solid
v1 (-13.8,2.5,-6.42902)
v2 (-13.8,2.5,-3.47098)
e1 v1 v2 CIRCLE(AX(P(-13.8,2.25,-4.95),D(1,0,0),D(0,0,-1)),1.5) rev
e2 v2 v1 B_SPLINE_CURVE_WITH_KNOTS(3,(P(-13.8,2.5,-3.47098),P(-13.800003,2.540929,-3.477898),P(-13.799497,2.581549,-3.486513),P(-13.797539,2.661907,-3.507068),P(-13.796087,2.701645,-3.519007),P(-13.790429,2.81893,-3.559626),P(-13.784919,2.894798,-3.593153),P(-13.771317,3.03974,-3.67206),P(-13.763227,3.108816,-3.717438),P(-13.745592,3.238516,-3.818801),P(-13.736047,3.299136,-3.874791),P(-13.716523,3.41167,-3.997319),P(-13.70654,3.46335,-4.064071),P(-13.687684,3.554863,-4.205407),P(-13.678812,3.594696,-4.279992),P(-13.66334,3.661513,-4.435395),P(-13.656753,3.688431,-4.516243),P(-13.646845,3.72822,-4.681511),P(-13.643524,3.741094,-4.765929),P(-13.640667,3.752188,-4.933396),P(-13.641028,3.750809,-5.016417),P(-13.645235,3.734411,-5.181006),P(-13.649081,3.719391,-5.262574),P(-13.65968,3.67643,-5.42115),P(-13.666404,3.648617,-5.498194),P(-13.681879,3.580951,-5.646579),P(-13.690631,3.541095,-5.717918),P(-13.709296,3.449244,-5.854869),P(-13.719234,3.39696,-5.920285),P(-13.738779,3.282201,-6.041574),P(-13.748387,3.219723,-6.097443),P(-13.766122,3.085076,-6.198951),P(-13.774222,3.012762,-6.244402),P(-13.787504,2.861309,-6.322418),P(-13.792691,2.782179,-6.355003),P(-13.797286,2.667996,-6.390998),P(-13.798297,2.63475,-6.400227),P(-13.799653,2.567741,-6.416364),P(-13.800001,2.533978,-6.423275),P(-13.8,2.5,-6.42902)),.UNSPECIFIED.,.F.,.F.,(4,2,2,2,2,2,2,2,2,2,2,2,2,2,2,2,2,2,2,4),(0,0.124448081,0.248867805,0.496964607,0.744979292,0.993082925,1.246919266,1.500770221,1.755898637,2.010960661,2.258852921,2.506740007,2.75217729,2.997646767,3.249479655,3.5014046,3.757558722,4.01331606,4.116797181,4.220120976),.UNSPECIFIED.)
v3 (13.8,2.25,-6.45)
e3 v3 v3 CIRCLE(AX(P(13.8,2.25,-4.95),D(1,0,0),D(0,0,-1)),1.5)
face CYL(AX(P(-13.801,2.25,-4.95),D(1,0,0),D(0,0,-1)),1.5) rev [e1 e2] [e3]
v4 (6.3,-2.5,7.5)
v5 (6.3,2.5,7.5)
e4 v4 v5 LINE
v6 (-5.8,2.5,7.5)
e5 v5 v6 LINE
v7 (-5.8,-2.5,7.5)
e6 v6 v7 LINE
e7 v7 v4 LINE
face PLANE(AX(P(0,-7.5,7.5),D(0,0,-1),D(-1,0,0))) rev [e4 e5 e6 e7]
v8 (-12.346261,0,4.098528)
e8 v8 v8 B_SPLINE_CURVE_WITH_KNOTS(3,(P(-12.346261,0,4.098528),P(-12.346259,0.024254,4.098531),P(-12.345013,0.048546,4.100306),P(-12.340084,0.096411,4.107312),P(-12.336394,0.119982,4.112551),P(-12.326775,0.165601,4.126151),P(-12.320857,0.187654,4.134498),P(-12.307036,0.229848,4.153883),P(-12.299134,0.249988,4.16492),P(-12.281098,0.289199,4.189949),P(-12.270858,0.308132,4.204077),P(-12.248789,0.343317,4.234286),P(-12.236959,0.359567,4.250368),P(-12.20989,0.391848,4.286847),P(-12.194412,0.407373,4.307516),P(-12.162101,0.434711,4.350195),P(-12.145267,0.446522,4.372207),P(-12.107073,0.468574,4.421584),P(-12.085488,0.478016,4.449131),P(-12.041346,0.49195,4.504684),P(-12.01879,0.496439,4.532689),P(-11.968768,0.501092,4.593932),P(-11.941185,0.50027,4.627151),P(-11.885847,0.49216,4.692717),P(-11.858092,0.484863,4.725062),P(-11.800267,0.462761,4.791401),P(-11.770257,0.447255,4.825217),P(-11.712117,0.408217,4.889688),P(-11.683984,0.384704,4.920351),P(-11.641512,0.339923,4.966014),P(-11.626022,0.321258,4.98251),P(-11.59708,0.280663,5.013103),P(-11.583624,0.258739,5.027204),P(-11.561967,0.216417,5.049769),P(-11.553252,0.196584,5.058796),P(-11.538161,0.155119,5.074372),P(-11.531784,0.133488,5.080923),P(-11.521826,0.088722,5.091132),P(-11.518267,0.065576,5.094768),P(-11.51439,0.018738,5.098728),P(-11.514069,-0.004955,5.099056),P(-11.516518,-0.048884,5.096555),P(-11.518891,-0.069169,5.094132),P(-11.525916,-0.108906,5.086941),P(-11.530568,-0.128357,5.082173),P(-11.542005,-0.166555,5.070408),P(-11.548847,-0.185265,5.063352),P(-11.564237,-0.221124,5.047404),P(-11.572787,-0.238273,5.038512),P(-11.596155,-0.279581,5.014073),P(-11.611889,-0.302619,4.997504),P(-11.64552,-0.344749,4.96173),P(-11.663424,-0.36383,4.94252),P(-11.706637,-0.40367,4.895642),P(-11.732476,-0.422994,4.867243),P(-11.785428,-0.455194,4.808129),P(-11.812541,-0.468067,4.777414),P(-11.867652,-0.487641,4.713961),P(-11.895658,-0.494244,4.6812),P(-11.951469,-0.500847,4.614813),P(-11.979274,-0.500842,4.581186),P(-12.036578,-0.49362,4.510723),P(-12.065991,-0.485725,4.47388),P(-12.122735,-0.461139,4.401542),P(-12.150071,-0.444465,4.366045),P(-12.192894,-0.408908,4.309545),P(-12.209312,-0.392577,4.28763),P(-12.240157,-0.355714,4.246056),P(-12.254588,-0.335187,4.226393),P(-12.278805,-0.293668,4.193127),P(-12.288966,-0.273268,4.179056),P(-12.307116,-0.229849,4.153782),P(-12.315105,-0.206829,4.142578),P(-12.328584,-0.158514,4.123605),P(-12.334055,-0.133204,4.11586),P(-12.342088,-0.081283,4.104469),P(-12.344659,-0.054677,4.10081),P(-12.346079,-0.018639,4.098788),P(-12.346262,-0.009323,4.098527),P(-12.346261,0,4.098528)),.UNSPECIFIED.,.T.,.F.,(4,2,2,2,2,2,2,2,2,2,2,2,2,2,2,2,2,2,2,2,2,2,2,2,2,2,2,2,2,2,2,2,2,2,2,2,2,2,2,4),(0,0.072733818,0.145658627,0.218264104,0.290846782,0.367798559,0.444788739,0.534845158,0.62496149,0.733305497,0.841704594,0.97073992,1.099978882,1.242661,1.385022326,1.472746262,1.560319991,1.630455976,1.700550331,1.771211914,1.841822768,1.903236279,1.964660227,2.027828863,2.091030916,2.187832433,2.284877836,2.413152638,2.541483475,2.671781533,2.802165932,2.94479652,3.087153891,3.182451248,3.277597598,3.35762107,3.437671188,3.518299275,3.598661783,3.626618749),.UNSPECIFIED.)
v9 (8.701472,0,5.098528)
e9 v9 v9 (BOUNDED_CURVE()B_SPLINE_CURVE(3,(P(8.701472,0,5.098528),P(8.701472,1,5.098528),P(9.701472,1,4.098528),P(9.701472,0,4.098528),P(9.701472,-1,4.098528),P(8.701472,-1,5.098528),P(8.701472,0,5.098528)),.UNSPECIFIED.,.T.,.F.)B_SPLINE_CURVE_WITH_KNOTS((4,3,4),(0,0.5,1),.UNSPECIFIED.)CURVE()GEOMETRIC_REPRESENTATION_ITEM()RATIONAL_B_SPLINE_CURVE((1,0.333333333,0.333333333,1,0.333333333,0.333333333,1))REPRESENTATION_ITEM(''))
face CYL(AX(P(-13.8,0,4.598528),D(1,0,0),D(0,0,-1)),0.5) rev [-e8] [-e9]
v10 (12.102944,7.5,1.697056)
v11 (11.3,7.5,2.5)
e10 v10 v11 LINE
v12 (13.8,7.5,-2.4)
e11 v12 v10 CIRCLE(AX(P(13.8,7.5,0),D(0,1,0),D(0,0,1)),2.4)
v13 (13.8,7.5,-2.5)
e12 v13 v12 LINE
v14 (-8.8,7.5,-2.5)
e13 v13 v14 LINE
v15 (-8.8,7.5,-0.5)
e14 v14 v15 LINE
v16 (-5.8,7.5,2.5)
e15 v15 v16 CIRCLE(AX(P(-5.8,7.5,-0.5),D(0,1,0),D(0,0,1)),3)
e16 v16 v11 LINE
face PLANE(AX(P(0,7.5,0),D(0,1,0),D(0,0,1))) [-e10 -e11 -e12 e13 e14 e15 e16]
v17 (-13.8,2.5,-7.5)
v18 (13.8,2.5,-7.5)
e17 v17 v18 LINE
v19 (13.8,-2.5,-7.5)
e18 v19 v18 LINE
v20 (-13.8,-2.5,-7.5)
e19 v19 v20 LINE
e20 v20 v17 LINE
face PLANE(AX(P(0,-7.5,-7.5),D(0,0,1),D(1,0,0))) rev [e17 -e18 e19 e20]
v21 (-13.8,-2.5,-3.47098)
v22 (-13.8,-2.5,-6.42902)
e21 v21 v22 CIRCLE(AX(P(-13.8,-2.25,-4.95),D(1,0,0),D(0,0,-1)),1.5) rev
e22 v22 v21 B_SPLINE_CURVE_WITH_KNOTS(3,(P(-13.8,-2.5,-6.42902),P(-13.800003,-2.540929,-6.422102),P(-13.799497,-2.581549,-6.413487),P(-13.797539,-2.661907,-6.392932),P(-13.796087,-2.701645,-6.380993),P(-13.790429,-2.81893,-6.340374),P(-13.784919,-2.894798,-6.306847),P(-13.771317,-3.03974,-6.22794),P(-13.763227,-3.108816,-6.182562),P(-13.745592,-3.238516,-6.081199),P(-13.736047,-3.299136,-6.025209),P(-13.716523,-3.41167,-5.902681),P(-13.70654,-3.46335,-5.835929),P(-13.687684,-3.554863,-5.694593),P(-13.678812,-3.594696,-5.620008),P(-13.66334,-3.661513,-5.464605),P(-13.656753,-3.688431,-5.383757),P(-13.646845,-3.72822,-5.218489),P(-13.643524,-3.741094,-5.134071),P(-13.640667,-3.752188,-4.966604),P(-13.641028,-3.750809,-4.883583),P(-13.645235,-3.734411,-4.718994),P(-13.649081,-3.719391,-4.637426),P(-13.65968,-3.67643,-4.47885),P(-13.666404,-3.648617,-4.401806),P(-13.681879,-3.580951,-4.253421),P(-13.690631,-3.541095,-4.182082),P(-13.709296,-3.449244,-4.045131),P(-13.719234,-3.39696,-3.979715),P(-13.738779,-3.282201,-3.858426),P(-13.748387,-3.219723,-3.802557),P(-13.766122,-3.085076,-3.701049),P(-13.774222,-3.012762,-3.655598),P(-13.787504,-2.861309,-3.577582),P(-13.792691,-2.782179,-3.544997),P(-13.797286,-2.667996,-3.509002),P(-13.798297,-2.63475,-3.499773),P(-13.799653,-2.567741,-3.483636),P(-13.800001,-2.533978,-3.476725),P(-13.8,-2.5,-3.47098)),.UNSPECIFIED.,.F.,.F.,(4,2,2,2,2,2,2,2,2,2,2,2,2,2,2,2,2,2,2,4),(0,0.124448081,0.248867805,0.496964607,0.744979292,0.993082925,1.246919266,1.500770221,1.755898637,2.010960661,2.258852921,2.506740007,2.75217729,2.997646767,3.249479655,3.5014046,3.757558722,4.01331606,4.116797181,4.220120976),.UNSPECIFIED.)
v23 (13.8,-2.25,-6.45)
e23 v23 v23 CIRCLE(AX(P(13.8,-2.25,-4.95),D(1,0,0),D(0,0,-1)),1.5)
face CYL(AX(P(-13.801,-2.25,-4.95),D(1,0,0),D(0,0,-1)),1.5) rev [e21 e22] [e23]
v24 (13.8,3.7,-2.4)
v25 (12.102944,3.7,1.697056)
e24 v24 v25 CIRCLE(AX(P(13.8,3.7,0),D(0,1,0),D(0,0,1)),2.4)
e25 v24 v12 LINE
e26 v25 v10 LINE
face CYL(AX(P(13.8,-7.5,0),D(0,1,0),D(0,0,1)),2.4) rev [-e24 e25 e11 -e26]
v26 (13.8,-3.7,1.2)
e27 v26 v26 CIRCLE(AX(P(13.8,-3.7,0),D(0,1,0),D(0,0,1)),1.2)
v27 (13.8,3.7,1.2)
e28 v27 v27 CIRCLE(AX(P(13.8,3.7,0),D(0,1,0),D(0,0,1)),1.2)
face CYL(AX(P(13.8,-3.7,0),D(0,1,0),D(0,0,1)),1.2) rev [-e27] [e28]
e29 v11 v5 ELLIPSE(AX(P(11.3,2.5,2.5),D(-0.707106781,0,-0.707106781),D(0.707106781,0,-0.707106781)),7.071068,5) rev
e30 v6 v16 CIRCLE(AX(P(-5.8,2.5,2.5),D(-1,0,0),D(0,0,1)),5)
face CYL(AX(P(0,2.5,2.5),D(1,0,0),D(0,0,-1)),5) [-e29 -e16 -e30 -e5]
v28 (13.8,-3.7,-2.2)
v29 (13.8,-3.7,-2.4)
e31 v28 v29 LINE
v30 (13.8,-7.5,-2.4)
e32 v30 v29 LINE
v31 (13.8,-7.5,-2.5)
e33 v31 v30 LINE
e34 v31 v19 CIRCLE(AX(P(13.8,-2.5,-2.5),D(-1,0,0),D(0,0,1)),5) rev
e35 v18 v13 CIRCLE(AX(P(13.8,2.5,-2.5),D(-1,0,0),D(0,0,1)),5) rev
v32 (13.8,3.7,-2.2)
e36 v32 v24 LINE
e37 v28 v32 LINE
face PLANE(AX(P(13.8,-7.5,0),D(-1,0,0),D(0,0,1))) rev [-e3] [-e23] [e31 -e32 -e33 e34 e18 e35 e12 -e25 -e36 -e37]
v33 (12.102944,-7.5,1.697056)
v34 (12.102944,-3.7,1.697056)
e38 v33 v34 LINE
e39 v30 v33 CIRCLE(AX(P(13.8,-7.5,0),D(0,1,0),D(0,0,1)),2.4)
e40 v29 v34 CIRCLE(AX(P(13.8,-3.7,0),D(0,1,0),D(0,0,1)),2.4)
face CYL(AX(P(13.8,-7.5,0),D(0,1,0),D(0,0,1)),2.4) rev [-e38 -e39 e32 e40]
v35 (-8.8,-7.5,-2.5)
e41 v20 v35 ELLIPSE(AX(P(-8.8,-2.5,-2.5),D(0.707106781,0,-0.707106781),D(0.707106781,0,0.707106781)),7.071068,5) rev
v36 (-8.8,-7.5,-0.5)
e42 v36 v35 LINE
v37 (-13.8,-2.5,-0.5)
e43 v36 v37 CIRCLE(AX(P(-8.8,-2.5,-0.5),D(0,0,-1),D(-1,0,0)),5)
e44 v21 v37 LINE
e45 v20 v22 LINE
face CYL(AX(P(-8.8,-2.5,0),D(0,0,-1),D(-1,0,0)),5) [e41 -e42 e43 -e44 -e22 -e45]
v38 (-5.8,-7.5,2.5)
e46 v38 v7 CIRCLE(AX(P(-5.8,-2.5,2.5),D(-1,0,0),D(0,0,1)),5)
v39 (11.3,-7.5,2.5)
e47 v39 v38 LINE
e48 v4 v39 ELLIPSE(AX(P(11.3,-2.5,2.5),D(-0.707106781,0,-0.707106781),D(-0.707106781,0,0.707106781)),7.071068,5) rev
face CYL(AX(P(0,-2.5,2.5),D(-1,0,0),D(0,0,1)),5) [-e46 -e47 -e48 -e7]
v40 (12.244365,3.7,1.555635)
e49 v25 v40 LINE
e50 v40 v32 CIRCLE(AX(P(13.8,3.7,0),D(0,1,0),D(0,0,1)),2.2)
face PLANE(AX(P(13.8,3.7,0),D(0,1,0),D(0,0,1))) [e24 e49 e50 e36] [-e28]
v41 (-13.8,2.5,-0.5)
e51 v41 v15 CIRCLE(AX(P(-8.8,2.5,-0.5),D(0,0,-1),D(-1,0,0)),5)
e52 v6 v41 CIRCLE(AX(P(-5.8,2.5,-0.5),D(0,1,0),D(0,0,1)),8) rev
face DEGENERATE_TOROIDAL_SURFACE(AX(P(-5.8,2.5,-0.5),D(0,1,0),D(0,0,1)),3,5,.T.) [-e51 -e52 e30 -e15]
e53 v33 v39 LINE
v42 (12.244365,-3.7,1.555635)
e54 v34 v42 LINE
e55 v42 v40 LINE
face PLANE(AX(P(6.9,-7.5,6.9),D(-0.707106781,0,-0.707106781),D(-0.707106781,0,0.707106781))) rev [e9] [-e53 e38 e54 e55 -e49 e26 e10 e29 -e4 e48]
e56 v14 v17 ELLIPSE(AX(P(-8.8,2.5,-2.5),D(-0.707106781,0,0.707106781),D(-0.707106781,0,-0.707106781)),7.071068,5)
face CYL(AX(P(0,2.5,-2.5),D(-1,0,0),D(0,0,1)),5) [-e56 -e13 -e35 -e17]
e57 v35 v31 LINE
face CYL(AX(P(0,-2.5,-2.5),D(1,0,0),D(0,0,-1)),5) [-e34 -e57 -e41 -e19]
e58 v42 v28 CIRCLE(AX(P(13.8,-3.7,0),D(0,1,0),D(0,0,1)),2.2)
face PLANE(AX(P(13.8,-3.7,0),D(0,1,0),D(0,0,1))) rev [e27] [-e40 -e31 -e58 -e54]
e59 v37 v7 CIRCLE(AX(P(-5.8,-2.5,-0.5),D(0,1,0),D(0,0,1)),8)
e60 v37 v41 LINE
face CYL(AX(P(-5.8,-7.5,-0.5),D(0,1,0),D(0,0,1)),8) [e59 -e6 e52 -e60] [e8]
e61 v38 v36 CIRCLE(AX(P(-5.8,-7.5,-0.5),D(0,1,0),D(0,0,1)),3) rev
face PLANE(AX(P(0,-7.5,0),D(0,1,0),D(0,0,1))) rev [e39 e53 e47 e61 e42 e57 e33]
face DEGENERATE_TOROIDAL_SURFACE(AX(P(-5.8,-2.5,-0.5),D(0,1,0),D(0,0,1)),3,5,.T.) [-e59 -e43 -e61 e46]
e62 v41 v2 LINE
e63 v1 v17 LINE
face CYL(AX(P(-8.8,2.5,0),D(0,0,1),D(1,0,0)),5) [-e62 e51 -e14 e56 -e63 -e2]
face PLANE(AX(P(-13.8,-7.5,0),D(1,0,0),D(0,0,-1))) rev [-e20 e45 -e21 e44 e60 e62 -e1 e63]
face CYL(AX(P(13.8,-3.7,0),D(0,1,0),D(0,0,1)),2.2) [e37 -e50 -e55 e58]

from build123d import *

# Parameters (mm, degrees)
BOSS_EXTRUDE1_DEPTH      = 7.5
BOSS_EXTRUDE1_DEPTH_BACK = 7.5
CUT_EXTRUDE3_REACH       = 31.568
SKETCH5_R                = 1.5
BOSS_EXTRUDE2_DEPTH      = 3.7
BOSS_EXTRUDE2_DEPTH_BACK = 3.7
SKETCH6_R                = 1.2
FILLET1_R                = 8
FILLET2_R                = 5
CUT_EXTRUDE4_START       = -12.346261552
CUT_EXTRUDE4_OUTLINE_R   = 0.5
CUT_EXTRUDE4_DEPTH       = 22.047733515


# Read off the part's stored shape, not the designer's step: Cut-Extrude4
with BuildPart() as part:
    # Sketch1 → Boss-Extrude1 (new, two sides: drawn at the far end of the back side and taken through both)
    with BuildSketch(Plane(origin=(0, 0, 0), x_dir=(-1, 0, 0), z_dir=(0, 1, 0)).offset(-BOSS_EXTRUDE1_DEPTH_BACK)):
        with BuildLine():
            Line((-13.8, -7.5), (13.8, -7.5))
            Line((13.8, -7.5), (13.8, 7.5))
            Line((13.8, 7.5), (-6.3, 7.5))
            Line((-6.3, 7.5), (-12.102943725, 1.697056275))
            ThreePointArc((-12.102943725, 1.697056275), (-11.582689122, -0.918440238), (-13.8, -2.4))
            Line((-13.8, -2.4), (-13.8, -7.5))
        make_face()
    extrude(amount=BOSS_EXTRUDE1_DEPTH + BOSS_EXTRUDE1_DEPTH_BACK)

    # Sketch5 → Cut-Extrude3 (cut, up to next)
    with BuildSketch(Plane.YZ.offset(13.8), mode=Mode.PRIVATE) as cut_extrude3_sk1:
        with Locations(Location((-2.25, -4.95, 0), (0, 0, 270))):
            Circle(SKETCH5_R)
    cut_extrude3_tool1 = extrude(cut_extrude3_sk1.sketch, amount=-CUT_EXTRUDE3_REACH, mode=Mode.PRIVATE) & part.part
    # Sketch5 → Cut-Extrude3 (cut, up to next)
    with BuildSketch(Plane.YZ.offset(13.8), mode=Mode.PRIVATE) as cut_extrude3_sk2:
        with Locations(Location((2.25, -4.95, 0), (0, 0, 270))):
            Circle(SKETCH5_R)
    cut_extrude3_tool2 = extrude(cut_extrude3_sk2.sketch, amount=-CUT_EXTRUDE3_REACH, mode=Mode.PRIVATE) & part.part
    add(cut_extrude3_tool1.solids().sort_by_distance((13.8, -2.25, -4.95))[0], mode=Mode.SUBTRACT)
    add(cut_extrude3_tool2.solids().sort_by_distance((13.8, 2.25, -4.95))[0], mode=Mode.SUBTRACT)

    # Sketch6 → Boss-Extrude2 (add, two sides: drawn at the far end of the back side and taken through both)
    with BuildSketch(Plane(origin=(0, 0, 0), x_dir=(-1, 0, 0), z_dir=(0, 1, 0)).offset(-BOSS_EXTRUDE2_DEPTH_BACK)):
        with BuildLine():
            Line((-12.102943725, 1.697056275), (-12.244365081, 1.555634919))
            ThreePointArc((-12.244365081, 1.555634919), (-15.832534972, 0.841903551), (-13.8, -2.2))
            Line((-13.8, -2.2), (-13.8, -2.4))
            ThreePointArc((-13.8, -2.4), (-11.582689122, -0.918440238), (-12.102943725, 1.697056275))
        make_face()
        with Locations(Location((-13.8, 0, 0), (0, 0, 90))):
            Circle(SKETCH6_R, mode=Mode.SUBTRACT)
    extrude(amount=BOSS_EXTRUDE2_DEPTH + BOSS_EXTRUDE2_DEPTH_BACK)

    # Fillet1
    fillet1_edges = [part.edges().sort_by_distance(p)[0] for p in [
        (-13.8, 0, 7.5),
    ]]
    fillet(fillet1_edges, radius=FILLET1_R)

    # Fillet2
    # the kernel refuses this fillet: 5 mm, written as the material it takes off along each edge
    with BuildSketch(Plane(origin=(26.3, -7.5, -7.5), x_dir=(0, 1, 0), z_dir=(-1, 0, 0)), Plane(origin=(26.3, 7.5, -7.5), x_dir=(0, 0, 1), z_dir=(-1, 0, 0))) as fillet2_piece_1:
        with BuildLine():
            CenterArc((FILLET2_R, -FILLET2_R), FILLET2_R, 90, 90)
            Line((0, -FILLET2_R), (0, 0))
            Line((0, 0), (FILLET2_R, 0))
        make_face()
    extrude(amount=52.6, mode=Mode.SUBTRACT)
    with BuildSketch(Plane(origin=(-5.8, 7.5, 7.5), x_dir=(0, 0, -1), z_dir=(1, 0, 0)), Plane(origin=(-5.8, -7.5, 7.5), x_dir=(0, 1, 0), z_dir=(1, 0, 0))) as fillet2_piece_2:
        with BuildLine():
            CenterArc((FILLET2_R, -FILLET2_R), FILLET2_R, 90, 90)
            Line((0, -FILLET2_R), (0, 0))
            Line((0, 0), (FILLET2_R, 0))
        make_face()
    extrude(amount=24.6, mode=Mode.SUBTRACT)
    with BuildSketch(Plane(origin=(-13.8, 7.5, -20), x_dir=(1, 0, 0), z_dir=(0, 0, 1)), Plane(origin=(-13.8, -7.5, -20), x_dir=(0, 1, 0), z_dir=(0, 0, 1))) as fillet2_piece_3:
        with BuildLine():
            CenterArc((FILLET2_R, -FILLET2_R), FILLET2_R, 90, 90)
            Line((0, -FILLET2_R), (0, 0))
            Line((0, 0), (FILLET2_R, 0))
        make_face()
    extrude(amount=19.5, mode=Mode.SUBTRACT)
    with BuildSketch(Plane(origin=(-5.8, 7.5, -0.5), x_dir=(0, 0, 1), z_dir=(1, 0, 0))) as fillet2_piece_4:
        with BuildLine():
            CenterArc((8 - FILLET2_R, FILLET2_R), FILLET2_R, 270, 90)
            Line((8, FILLET2_R), (8, 0))
            Line((8, 0), (8 - FILLET2_R, 0))
        make_face()
    revolve(axis=Axis((-5.8, 7.5, -0.5), (0, -1, 0)), revolution_arc=90, mode=Mode.SUBTRACT)
    with BuildSketch(Plane(origin=(-5.8, -7.5, -0.5), x_dir=(0, 0, 1), z_dir=(1, 0, 0))) as fillet2_piece_5:
        with BuildLine():
            CenterArc((8 - FILLET2_R, -FILLET2_R), FILLET2_R, 0, 90)
            Line((8 - FILLET2_R, 0), (8, 0))
            Line((8, 0), (8, -FILLET2_R))
        make_face()
    revolve(axis=Axis((-5.8, -7.5, -0.5), (0, -1, 0)), revolution_arc=90, mode=Mode.SUBTRACT)

    # Cut-Extrude4 outline → Cut-Extrude4 (cut)
    with BuildSketch(Plane.YZ.offset(CUT_EXTRUDE4_START)):
        with Locations((0, 4.598528137)):
            Circle(CUT_EXTRUDE4_OUTLINE_R)
    extrude(amount=CUT_EXTRUDE4_DEPTH, mode=Mode.SUBTRACT)


solid = part.part
